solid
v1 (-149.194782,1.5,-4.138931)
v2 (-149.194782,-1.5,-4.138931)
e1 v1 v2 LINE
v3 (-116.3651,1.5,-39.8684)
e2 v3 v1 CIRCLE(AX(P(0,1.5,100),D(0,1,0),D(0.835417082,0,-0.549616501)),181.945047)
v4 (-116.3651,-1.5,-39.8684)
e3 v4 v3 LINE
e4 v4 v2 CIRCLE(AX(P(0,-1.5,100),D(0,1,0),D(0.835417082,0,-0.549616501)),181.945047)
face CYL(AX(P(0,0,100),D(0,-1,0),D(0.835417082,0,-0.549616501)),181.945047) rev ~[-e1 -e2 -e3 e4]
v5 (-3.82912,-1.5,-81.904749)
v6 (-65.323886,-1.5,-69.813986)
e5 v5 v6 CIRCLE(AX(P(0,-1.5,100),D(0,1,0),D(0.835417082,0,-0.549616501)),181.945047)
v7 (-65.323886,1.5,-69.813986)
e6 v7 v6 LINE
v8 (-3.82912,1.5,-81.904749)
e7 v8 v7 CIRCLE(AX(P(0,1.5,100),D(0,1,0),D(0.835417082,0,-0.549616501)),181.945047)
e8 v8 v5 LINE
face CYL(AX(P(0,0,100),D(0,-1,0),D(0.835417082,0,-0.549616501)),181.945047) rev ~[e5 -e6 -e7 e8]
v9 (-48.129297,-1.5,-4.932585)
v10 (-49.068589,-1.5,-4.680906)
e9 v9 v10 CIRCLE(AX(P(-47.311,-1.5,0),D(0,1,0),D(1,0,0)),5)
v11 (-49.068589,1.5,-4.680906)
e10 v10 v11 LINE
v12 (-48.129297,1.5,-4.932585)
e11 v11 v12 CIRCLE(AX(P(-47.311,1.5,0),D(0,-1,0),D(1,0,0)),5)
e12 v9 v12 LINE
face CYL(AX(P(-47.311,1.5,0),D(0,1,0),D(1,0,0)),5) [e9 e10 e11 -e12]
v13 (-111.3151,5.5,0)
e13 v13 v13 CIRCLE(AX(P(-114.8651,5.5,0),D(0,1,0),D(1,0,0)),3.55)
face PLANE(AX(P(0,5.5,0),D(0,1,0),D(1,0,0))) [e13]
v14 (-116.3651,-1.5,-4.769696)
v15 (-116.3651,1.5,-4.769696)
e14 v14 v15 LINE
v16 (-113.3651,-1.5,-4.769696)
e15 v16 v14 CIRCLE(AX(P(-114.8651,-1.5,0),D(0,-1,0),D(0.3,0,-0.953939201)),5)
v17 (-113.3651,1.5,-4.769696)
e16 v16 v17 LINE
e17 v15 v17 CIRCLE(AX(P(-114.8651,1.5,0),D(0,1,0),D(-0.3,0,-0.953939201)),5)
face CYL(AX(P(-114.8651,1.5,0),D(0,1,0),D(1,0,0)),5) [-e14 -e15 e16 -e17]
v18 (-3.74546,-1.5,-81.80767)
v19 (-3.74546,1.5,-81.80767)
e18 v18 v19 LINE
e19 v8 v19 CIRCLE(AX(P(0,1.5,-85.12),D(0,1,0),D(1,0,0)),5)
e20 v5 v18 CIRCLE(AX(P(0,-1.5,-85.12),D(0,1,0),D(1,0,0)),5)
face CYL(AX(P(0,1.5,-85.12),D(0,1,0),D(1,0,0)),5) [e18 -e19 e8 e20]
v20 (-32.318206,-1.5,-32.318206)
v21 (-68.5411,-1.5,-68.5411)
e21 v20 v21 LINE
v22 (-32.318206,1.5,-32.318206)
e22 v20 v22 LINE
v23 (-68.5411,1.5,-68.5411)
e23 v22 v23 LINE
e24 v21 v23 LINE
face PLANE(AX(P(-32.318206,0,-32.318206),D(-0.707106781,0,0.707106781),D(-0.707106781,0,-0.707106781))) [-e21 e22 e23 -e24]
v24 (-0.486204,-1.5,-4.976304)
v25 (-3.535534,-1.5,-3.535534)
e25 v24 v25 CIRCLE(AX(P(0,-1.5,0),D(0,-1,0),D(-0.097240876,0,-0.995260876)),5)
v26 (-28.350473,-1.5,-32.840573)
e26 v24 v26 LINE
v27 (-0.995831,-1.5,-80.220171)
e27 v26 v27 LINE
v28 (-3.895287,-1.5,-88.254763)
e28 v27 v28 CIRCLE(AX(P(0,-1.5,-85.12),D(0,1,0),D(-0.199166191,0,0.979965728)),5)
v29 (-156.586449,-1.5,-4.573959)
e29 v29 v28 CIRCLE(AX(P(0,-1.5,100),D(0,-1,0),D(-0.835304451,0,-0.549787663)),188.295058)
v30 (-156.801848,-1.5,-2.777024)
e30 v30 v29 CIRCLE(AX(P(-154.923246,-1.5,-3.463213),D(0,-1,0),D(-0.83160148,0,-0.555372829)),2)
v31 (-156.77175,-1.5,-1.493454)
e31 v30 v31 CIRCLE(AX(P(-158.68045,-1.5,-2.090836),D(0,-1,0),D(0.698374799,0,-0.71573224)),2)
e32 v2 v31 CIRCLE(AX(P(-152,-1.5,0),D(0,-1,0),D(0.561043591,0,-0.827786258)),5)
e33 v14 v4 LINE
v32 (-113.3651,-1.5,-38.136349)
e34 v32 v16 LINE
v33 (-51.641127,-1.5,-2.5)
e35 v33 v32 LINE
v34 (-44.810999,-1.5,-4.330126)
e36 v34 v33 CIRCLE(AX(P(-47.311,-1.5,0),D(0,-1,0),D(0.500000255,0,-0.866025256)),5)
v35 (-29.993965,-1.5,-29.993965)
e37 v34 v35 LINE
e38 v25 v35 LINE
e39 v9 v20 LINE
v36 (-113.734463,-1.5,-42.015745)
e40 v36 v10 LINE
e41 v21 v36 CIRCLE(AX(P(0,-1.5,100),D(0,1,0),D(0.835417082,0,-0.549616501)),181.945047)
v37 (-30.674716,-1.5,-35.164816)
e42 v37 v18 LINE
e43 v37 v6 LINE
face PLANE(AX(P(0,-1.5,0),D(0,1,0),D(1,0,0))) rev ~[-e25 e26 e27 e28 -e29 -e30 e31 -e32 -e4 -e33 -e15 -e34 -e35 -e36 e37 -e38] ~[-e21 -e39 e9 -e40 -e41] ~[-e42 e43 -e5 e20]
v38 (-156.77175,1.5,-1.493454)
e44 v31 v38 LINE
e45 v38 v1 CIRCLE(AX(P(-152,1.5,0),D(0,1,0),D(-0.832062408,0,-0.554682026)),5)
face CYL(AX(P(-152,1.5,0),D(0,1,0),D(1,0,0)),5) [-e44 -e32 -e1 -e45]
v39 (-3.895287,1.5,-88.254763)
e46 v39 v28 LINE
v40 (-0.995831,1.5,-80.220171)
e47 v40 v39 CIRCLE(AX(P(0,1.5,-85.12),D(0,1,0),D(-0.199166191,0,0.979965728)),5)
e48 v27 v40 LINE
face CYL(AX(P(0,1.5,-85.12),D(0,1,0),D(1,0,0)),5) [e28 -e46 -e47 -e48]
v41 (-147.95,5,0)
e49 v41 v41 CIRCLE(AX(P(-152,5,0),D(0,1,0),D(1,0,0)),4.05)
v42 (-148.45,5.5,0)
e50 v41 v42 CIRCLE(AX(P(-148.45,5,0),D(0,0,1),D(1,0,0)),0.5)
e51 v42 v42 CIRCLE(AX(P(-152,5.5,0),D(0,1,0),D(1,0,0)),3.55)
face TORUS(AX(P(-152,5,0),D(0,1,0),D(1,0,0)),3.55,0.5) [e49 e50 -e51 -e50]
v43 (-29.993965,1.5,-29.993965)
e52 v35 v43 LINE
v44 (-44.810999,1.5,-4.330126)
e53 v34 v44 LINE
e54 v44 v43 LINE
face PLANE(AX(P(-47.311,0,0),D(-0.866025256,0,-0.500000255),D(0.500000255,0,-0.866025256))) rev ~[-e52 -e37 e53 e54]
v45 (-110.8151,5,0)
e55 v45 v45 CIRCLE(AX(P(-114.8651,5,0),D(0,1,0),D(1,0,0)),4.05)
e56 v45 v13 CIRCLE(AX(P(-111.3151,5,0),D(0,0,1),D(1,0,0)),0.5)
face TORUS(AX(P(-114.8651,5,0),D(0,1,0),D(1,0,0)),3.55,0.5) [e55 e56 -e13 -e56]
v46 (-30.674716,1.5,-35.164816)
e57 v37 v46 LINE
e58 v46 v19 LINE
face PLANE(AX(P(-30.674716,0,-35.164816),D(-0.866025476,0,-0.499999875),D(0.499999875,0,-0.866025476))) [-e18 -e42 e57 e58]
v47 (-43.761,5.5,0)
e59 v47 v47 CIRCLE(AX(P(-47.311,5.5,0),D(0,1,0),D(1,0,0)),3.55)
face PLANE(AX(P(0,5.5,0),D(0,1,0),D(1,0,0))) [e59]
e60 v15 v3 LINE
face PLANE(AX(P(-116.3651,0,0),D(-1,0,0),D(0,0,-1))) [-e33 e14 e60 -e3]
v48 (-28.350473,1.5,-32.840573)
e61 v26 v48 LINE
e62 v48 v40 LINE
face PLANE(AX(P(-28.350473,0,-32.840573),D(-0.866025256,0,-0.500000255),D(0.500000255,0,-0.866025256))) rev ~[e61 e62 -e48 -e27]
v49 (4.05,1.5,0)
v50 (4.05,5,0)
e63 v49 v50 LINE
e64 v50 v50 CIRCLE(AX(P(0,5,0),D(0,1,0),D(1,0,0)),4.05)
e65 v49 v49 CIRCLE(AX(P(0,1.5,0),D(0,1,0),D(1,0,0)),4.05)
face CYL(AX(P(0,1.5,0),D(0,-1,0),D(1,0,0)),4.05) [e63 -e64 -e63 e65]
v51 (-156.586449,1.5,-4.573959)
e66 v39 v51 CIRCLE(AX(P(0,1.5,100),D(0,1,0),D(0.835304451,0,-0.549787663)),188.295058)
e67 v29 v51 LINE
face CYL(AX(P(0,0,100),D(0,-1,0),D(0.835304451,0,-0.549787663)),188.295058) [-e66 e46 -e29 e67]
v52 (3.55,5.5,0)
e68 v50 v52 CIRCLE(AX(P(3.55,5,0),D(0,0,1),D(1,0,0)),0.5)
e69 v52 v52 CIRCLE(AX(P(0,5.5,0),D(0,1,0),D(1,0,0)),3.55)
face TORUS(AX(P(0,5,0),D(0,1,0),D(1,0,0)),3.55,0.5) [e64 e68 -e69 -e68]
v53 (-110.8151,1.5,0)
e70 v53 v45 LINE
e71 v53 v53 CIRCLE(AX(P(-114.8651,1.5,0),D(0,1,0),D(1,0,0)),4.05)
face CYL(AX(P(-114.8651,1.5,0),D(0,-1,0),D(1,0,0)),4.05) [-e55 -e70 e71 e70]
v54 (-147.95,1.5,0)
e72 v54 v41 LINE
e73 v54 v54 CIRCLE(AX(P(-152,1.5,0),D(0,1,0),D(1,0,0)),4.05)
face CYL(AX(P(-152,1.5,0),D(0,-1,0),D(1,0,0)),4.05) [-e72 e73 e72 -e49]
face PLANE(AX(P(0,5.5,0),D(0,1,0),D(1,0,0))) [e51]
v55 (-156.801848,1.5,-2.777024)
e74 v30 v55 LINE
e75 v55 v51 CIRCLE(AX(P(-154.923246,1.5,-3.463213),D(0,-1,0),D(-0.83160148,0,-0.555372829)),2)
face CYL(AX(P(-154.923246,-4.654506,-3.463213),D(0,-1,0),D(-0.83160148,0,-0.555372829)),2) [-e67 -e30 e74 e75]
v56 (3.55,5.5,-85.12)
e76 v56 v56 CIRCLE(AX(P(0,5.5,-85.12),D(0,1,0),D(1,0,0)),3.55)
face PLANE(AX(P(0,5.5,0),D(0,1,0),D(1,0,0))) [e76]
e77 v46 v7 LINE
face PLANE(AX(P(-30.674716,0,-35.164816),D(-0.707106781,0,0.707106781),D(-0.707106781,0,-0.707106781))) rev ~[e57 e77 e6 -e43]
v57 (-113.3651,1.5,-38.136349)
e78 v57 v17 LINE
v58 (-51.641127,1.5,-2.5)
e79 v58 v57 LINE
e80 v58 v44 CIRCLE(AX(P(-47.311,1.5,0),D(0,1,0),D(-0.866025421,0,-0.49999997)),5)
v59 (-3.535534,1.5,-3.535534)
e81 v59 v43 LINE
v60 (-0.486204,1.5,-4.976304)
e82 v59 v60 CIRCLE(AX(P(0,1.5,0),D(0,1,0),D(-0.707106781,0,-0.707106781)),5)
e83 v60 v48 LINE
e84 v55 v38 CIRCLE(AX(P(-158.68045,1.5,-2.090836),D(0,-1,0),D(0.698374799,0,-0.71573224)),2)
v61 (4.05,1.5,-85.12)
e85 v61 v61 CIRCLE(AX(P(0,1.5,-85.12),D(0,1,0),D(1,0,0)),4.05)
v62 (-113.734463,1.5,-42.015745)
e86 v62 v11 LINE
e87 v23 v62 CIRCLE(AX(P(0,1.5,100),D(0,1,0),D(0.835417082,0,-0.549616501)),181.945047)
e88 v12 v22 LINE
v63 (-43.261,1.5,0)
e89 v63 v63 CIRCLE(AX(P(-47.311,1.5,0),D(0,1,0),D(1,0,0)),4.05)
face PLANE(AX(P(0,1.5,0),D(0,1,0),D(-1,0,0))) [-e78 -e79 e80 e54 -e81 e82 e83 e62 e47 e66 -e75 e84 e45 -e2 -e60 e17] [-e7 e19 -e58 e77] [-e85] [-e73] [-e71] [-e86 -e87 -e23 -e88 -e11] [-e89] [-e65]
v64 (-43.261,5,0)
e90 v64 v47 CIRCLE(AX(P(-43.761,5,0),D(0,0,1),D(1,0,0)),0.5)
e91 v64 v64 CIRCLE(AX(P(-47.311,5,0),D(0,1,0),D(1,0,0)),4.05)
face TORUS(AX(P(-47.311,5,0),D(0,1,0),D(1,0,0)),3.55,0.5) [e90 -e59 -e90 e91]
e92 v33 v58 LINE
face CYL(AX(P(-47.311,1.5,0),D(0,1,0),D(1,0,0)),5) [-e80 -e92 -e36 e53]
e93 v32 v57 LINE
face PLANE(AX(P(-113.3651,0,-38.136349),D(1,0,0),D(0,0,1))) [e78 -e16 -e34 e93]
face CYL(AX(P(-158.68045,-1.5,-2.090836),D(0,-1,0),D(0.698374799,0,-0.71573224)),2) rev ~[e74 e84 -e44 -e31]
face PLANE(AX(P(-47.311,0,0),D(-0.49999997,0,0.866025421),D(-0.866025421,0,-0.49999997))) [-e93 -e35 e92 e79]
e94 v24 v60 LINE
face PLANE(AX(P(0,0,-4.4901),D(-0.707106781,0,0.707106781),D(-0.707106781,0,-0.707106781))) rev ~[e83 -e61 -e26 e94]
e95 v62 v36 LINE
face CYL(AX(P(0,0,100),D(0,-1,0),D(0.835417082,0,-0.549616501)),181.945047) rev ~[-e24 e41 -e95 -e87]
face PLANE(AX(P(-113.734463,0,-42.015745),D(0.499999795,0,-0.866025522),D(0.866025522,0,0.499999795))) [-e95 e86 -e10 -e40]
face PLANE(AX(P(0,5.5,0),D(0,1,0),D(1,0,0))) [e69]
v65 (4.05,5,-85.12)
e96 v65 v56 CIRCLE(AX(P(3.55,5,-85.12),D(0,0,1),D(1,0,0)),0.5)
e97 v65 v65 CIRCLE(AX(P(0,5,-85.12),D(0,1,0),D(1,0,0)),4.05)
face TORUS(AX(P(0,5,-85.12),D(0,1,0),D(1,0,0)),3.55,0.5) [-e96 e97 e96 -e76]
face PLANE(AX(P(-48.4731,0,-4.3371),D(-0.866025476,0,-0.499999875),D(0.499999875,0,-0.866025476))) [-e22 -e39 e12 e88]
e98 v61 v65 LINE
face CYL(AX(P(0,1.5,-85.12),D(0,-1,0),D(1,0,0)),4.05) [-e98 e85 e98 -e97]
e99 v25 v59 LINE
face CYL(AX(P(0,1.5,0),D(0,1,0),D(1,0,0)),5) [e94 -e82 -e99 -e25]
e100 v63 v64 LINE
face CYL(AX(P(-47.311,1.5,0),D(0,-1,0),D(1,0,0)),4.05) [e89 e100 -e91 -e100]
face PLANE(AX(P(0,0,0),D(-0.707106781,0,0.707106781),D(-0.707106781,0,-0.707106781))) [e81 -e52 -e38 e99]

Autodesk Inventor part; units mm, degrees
ref_plane "YZ Plane" through (0, 0, 0) normal (1, 0, 0) x (0, 1, 0)
ref_plane "XZ Plane" through (0, 0, 0) normal (0, 1, 0) x (-1, 0, 0)
ref_plane "XY Plane" through (0, 0, 0) normal (0, 0, 1) x (1, 0, 0)
sketch "Sketch1" plane through (0, 0, 0) normal (0, 1, 0) x (-1, 0, 0)
  arc A0 (-152, 0) -> (152, 0) centre (0, 100) ccw
  line L0 (0, -81.945) -> (-47.311, 0)
  line L1 (-47.311, 0) -> (47.311, 0) construction
  line L2 (47.311, 0) -> (0, -81.945)
  line L3 (0, 0) -> (68.5411, -68.5411)
  line L4 (0, 0) -> (-68.5411, -68.5411)
  line L5 (47.311, 0) -> (116.3651, -39.8684)
  line L6 (-47.311, 0) -> (-116.3651, -39.8684)
  line L7 (114.7776, -42.618) -> (48.4731, -4.3371)
  line L8 (48.4731, -4.3371) -> (0, -88.295)
  line L9 (0, -88.295) -> (-48.4731, -4.3371)
  line L10 (-48.4731, -4.3371) -> (-114.4332, -42.4192)
  line L11 (-66.0999, -70.5901) -> (0, -4.4901)
  line L12 (0, -4.4901) -> (66.2961, -70.7862)
  line L13 (116.3651, -39.8684) -> (114.7776, -42.618)
  line L14 (68.5411, -68.5411) -> (66.2961, -70.7862)
  line L15 (-66.0999, -70.5901) -> (-67.8825, -68.8075)
  line L16 (-114.4332, -42.4192) -> (-115.4867, -40.5945)
  arc A1 (-157.2837, -3.5223) -> (157.2837, -3.5223) centre (0, 100) ccw
  line L17 (157.2837, -3.5223) -> (152, 0)
  line L18 (-152, 0) -> (-157.2837, -3.5223)
  line L19 (116.3651, -39.8684) -> (113.3651, -39.8684)
  line L20 (113.3651, -39.8684) -> (113.3651, 0)
  line L21 (113.3651, 0) -> (116.3651, 0)
  line L22 (116.3651, 0) -> (116.3651, -39.8684)
  line L23 (0, 0) -> (0, -27.315) construction
  line L24 (-116.3651, -39.8684) -> (-113.3651, -39.8684)
  line L25 (-113.3651, -39.8684) -> (-113.3651, 0)
  line L26 (-113.3651, 0) -> (-116.3651, 0)
  line L27 (-116.3651, 0) -> (-116.3651, -39.8684)
  point P0 (-3.6878, -81.9077)
  point P1 (-65.3239, -69.814)
  point P2 (-30.6747, -35.1649)
  point P3 (29.994, -29.994)
  point P4 (-29.994, -29.994)
  point P5 (32.3182, -32.3182)
  point P6 (113.7344, -42.0158)
  point P7 (30.6747, -35.1649)
  point P8 (65.3239, -69.814)
  point P9 (3.6878, -81.9077)
  point P10 (-28.3505, -32.8406)
  point P11 (28.3505, -32.8406)
  point P12 (-32.3182, -32.3182)
  point P13 (-113.7344, -42.0158)
  point P14 (-113.3651, -38.1363)
  point P15 (113.3651, -38.1363)
  point P16 (0, 0)
  dimension "d0" = 152
  dimension "d1" = 152
  dimension "d2" = 100
  dimension "d3" = 0
  dimension "d4" = 45
  dimension "d8" = 3.175
  dimension "d9" = 3.175
  dimension "d10" = 6.35
  dimension "d11" = 6.35
  dimension "d12" = 3.5223
  dimension "d13" = 3.5223
  dimension "d29" = 3
  dimension "d30" = 157.2837
extrude "Extrusion1" add sketch "Sketch1" along normal mid plane 3 contours A0 L16 L10 L15 L11 L9 A1 L18 | L24 L25 L6 L0 L4 L9 L10 A0 | L27 L26 L25 L6 | L6 L25 L24 | A0 L10 L16 | L9 A0 L8 | L8 A0 L12 L14 L7 L13 L17 A1 | A0 L2 L12 L8 | L9 L11 L0 A0 | L4 L9 L11 A0 | L4 L3 L2 L12 L11 L0 | L0 L11 L9 L4 | L12 L8 L3 A0 | A0 L14 L12 | L12 L2 L3 L8 | L11 L15 A0 | L3 L2 L5 L20 L19 A0 L7 L8 | L13 L7 A0 | L19 L20 L5 | L5 L20 L21 L22
sketch "Sketch2" plane through (0, 1.5, 0) normal (0, 1, 0) x (1, 0, 0)
  line L0 (0, 0) -> (29.994, 29.994) projected
  line L1 (0, 0) -> (200, 0)
  line L2 (200, 0) -> (200, 200)
  line L3 (200, 200) -> (0, 200)
  line L4 (0, 200) -> (0, 0)
  dimension "d16" = 200
  dimension "d17" = 200
extrude "Extrusion2" cut sketch "Sketch2" along normal through all both and the other way through all
sketch "Sketch3" plane through (0, 1.5, 0) normal (0, 1, 0) x (1, 0, 0)
  line L0 (-29.994, 29.994) -> (0, 0) projected
  circle A0 centre (0, 0) radius 5
  line L1 (-157.2837, 3.5223) -> (-152, 0) projected
  line L2 (-47.311, 0) -> (-29.994, 29.994) projected
  circle A1 centre (-47.311, 0) radius 5
  line L3 (0, 81.945) -> (0, 88.295) projected
  circle A2 centre (0, 85.12) radius 5
  circle A3 centre (-152, 0) radius 5
  line L4 (-116.3651, 0) -> (-113.3651, 0) projected
  circle A4 centre (-114.8651, 0) radius 5
  dimension "d20" = 10
extrude "Circular_Mounts" add sketch "Sketch3" against normal blind 3
sketch "Sketch4" plane through (0, 1.5, 0) normal (0, 1, 0) x (1, 0, 0)
  arc A0 (-51.6411, 2.5) -> (-44.811, 4.3301) centre (-47.311, 0) ccw projected
  circle A1 centre (-47.311, 0) radius 4.05
  circle A2 centre (0, 0) radius 4.05
  arc A3 (-156.1603, 2.7735) -> (-149.1948, 4.1389) centre (-152, 0) ccw projected
  circle A4 centre (-152, 0) radius 4.05
  arc A5 (-0.9958, 80.2202) -> (-3.8953, 88.2548) centre (0, 85.12) ccw projected
  circle A6 centre (0, 85.12) radius 4.05
  arc A7 (-116.3651, 4.7697) -> (-113.3651, 4.7697) centre (-114.8651, 0) ccw projected
  circle A8 centre (-114.8651, 0) radius 4.05
  dimension "d23" = 8.1
extrude "Inserts" add sketch "Sketch4" along normal blind 4
fillet "Fillet2" radius 0.5 5 edges at (-156.05, 5.5, 0) (-51.361, 5.5, 0) (-4.05, 5.5, 0) (-4.05, 5.5, -85.12) (-118.9151, 5.5, 0)
fillet "Fillet3" radius 2 2 edges at (-156.1603, 0, -2.7735) (-157.2837, 0, -3.5223)
equation "\"d1\" = d0"
properties part number "W-Support" material "ABS Plastic"
